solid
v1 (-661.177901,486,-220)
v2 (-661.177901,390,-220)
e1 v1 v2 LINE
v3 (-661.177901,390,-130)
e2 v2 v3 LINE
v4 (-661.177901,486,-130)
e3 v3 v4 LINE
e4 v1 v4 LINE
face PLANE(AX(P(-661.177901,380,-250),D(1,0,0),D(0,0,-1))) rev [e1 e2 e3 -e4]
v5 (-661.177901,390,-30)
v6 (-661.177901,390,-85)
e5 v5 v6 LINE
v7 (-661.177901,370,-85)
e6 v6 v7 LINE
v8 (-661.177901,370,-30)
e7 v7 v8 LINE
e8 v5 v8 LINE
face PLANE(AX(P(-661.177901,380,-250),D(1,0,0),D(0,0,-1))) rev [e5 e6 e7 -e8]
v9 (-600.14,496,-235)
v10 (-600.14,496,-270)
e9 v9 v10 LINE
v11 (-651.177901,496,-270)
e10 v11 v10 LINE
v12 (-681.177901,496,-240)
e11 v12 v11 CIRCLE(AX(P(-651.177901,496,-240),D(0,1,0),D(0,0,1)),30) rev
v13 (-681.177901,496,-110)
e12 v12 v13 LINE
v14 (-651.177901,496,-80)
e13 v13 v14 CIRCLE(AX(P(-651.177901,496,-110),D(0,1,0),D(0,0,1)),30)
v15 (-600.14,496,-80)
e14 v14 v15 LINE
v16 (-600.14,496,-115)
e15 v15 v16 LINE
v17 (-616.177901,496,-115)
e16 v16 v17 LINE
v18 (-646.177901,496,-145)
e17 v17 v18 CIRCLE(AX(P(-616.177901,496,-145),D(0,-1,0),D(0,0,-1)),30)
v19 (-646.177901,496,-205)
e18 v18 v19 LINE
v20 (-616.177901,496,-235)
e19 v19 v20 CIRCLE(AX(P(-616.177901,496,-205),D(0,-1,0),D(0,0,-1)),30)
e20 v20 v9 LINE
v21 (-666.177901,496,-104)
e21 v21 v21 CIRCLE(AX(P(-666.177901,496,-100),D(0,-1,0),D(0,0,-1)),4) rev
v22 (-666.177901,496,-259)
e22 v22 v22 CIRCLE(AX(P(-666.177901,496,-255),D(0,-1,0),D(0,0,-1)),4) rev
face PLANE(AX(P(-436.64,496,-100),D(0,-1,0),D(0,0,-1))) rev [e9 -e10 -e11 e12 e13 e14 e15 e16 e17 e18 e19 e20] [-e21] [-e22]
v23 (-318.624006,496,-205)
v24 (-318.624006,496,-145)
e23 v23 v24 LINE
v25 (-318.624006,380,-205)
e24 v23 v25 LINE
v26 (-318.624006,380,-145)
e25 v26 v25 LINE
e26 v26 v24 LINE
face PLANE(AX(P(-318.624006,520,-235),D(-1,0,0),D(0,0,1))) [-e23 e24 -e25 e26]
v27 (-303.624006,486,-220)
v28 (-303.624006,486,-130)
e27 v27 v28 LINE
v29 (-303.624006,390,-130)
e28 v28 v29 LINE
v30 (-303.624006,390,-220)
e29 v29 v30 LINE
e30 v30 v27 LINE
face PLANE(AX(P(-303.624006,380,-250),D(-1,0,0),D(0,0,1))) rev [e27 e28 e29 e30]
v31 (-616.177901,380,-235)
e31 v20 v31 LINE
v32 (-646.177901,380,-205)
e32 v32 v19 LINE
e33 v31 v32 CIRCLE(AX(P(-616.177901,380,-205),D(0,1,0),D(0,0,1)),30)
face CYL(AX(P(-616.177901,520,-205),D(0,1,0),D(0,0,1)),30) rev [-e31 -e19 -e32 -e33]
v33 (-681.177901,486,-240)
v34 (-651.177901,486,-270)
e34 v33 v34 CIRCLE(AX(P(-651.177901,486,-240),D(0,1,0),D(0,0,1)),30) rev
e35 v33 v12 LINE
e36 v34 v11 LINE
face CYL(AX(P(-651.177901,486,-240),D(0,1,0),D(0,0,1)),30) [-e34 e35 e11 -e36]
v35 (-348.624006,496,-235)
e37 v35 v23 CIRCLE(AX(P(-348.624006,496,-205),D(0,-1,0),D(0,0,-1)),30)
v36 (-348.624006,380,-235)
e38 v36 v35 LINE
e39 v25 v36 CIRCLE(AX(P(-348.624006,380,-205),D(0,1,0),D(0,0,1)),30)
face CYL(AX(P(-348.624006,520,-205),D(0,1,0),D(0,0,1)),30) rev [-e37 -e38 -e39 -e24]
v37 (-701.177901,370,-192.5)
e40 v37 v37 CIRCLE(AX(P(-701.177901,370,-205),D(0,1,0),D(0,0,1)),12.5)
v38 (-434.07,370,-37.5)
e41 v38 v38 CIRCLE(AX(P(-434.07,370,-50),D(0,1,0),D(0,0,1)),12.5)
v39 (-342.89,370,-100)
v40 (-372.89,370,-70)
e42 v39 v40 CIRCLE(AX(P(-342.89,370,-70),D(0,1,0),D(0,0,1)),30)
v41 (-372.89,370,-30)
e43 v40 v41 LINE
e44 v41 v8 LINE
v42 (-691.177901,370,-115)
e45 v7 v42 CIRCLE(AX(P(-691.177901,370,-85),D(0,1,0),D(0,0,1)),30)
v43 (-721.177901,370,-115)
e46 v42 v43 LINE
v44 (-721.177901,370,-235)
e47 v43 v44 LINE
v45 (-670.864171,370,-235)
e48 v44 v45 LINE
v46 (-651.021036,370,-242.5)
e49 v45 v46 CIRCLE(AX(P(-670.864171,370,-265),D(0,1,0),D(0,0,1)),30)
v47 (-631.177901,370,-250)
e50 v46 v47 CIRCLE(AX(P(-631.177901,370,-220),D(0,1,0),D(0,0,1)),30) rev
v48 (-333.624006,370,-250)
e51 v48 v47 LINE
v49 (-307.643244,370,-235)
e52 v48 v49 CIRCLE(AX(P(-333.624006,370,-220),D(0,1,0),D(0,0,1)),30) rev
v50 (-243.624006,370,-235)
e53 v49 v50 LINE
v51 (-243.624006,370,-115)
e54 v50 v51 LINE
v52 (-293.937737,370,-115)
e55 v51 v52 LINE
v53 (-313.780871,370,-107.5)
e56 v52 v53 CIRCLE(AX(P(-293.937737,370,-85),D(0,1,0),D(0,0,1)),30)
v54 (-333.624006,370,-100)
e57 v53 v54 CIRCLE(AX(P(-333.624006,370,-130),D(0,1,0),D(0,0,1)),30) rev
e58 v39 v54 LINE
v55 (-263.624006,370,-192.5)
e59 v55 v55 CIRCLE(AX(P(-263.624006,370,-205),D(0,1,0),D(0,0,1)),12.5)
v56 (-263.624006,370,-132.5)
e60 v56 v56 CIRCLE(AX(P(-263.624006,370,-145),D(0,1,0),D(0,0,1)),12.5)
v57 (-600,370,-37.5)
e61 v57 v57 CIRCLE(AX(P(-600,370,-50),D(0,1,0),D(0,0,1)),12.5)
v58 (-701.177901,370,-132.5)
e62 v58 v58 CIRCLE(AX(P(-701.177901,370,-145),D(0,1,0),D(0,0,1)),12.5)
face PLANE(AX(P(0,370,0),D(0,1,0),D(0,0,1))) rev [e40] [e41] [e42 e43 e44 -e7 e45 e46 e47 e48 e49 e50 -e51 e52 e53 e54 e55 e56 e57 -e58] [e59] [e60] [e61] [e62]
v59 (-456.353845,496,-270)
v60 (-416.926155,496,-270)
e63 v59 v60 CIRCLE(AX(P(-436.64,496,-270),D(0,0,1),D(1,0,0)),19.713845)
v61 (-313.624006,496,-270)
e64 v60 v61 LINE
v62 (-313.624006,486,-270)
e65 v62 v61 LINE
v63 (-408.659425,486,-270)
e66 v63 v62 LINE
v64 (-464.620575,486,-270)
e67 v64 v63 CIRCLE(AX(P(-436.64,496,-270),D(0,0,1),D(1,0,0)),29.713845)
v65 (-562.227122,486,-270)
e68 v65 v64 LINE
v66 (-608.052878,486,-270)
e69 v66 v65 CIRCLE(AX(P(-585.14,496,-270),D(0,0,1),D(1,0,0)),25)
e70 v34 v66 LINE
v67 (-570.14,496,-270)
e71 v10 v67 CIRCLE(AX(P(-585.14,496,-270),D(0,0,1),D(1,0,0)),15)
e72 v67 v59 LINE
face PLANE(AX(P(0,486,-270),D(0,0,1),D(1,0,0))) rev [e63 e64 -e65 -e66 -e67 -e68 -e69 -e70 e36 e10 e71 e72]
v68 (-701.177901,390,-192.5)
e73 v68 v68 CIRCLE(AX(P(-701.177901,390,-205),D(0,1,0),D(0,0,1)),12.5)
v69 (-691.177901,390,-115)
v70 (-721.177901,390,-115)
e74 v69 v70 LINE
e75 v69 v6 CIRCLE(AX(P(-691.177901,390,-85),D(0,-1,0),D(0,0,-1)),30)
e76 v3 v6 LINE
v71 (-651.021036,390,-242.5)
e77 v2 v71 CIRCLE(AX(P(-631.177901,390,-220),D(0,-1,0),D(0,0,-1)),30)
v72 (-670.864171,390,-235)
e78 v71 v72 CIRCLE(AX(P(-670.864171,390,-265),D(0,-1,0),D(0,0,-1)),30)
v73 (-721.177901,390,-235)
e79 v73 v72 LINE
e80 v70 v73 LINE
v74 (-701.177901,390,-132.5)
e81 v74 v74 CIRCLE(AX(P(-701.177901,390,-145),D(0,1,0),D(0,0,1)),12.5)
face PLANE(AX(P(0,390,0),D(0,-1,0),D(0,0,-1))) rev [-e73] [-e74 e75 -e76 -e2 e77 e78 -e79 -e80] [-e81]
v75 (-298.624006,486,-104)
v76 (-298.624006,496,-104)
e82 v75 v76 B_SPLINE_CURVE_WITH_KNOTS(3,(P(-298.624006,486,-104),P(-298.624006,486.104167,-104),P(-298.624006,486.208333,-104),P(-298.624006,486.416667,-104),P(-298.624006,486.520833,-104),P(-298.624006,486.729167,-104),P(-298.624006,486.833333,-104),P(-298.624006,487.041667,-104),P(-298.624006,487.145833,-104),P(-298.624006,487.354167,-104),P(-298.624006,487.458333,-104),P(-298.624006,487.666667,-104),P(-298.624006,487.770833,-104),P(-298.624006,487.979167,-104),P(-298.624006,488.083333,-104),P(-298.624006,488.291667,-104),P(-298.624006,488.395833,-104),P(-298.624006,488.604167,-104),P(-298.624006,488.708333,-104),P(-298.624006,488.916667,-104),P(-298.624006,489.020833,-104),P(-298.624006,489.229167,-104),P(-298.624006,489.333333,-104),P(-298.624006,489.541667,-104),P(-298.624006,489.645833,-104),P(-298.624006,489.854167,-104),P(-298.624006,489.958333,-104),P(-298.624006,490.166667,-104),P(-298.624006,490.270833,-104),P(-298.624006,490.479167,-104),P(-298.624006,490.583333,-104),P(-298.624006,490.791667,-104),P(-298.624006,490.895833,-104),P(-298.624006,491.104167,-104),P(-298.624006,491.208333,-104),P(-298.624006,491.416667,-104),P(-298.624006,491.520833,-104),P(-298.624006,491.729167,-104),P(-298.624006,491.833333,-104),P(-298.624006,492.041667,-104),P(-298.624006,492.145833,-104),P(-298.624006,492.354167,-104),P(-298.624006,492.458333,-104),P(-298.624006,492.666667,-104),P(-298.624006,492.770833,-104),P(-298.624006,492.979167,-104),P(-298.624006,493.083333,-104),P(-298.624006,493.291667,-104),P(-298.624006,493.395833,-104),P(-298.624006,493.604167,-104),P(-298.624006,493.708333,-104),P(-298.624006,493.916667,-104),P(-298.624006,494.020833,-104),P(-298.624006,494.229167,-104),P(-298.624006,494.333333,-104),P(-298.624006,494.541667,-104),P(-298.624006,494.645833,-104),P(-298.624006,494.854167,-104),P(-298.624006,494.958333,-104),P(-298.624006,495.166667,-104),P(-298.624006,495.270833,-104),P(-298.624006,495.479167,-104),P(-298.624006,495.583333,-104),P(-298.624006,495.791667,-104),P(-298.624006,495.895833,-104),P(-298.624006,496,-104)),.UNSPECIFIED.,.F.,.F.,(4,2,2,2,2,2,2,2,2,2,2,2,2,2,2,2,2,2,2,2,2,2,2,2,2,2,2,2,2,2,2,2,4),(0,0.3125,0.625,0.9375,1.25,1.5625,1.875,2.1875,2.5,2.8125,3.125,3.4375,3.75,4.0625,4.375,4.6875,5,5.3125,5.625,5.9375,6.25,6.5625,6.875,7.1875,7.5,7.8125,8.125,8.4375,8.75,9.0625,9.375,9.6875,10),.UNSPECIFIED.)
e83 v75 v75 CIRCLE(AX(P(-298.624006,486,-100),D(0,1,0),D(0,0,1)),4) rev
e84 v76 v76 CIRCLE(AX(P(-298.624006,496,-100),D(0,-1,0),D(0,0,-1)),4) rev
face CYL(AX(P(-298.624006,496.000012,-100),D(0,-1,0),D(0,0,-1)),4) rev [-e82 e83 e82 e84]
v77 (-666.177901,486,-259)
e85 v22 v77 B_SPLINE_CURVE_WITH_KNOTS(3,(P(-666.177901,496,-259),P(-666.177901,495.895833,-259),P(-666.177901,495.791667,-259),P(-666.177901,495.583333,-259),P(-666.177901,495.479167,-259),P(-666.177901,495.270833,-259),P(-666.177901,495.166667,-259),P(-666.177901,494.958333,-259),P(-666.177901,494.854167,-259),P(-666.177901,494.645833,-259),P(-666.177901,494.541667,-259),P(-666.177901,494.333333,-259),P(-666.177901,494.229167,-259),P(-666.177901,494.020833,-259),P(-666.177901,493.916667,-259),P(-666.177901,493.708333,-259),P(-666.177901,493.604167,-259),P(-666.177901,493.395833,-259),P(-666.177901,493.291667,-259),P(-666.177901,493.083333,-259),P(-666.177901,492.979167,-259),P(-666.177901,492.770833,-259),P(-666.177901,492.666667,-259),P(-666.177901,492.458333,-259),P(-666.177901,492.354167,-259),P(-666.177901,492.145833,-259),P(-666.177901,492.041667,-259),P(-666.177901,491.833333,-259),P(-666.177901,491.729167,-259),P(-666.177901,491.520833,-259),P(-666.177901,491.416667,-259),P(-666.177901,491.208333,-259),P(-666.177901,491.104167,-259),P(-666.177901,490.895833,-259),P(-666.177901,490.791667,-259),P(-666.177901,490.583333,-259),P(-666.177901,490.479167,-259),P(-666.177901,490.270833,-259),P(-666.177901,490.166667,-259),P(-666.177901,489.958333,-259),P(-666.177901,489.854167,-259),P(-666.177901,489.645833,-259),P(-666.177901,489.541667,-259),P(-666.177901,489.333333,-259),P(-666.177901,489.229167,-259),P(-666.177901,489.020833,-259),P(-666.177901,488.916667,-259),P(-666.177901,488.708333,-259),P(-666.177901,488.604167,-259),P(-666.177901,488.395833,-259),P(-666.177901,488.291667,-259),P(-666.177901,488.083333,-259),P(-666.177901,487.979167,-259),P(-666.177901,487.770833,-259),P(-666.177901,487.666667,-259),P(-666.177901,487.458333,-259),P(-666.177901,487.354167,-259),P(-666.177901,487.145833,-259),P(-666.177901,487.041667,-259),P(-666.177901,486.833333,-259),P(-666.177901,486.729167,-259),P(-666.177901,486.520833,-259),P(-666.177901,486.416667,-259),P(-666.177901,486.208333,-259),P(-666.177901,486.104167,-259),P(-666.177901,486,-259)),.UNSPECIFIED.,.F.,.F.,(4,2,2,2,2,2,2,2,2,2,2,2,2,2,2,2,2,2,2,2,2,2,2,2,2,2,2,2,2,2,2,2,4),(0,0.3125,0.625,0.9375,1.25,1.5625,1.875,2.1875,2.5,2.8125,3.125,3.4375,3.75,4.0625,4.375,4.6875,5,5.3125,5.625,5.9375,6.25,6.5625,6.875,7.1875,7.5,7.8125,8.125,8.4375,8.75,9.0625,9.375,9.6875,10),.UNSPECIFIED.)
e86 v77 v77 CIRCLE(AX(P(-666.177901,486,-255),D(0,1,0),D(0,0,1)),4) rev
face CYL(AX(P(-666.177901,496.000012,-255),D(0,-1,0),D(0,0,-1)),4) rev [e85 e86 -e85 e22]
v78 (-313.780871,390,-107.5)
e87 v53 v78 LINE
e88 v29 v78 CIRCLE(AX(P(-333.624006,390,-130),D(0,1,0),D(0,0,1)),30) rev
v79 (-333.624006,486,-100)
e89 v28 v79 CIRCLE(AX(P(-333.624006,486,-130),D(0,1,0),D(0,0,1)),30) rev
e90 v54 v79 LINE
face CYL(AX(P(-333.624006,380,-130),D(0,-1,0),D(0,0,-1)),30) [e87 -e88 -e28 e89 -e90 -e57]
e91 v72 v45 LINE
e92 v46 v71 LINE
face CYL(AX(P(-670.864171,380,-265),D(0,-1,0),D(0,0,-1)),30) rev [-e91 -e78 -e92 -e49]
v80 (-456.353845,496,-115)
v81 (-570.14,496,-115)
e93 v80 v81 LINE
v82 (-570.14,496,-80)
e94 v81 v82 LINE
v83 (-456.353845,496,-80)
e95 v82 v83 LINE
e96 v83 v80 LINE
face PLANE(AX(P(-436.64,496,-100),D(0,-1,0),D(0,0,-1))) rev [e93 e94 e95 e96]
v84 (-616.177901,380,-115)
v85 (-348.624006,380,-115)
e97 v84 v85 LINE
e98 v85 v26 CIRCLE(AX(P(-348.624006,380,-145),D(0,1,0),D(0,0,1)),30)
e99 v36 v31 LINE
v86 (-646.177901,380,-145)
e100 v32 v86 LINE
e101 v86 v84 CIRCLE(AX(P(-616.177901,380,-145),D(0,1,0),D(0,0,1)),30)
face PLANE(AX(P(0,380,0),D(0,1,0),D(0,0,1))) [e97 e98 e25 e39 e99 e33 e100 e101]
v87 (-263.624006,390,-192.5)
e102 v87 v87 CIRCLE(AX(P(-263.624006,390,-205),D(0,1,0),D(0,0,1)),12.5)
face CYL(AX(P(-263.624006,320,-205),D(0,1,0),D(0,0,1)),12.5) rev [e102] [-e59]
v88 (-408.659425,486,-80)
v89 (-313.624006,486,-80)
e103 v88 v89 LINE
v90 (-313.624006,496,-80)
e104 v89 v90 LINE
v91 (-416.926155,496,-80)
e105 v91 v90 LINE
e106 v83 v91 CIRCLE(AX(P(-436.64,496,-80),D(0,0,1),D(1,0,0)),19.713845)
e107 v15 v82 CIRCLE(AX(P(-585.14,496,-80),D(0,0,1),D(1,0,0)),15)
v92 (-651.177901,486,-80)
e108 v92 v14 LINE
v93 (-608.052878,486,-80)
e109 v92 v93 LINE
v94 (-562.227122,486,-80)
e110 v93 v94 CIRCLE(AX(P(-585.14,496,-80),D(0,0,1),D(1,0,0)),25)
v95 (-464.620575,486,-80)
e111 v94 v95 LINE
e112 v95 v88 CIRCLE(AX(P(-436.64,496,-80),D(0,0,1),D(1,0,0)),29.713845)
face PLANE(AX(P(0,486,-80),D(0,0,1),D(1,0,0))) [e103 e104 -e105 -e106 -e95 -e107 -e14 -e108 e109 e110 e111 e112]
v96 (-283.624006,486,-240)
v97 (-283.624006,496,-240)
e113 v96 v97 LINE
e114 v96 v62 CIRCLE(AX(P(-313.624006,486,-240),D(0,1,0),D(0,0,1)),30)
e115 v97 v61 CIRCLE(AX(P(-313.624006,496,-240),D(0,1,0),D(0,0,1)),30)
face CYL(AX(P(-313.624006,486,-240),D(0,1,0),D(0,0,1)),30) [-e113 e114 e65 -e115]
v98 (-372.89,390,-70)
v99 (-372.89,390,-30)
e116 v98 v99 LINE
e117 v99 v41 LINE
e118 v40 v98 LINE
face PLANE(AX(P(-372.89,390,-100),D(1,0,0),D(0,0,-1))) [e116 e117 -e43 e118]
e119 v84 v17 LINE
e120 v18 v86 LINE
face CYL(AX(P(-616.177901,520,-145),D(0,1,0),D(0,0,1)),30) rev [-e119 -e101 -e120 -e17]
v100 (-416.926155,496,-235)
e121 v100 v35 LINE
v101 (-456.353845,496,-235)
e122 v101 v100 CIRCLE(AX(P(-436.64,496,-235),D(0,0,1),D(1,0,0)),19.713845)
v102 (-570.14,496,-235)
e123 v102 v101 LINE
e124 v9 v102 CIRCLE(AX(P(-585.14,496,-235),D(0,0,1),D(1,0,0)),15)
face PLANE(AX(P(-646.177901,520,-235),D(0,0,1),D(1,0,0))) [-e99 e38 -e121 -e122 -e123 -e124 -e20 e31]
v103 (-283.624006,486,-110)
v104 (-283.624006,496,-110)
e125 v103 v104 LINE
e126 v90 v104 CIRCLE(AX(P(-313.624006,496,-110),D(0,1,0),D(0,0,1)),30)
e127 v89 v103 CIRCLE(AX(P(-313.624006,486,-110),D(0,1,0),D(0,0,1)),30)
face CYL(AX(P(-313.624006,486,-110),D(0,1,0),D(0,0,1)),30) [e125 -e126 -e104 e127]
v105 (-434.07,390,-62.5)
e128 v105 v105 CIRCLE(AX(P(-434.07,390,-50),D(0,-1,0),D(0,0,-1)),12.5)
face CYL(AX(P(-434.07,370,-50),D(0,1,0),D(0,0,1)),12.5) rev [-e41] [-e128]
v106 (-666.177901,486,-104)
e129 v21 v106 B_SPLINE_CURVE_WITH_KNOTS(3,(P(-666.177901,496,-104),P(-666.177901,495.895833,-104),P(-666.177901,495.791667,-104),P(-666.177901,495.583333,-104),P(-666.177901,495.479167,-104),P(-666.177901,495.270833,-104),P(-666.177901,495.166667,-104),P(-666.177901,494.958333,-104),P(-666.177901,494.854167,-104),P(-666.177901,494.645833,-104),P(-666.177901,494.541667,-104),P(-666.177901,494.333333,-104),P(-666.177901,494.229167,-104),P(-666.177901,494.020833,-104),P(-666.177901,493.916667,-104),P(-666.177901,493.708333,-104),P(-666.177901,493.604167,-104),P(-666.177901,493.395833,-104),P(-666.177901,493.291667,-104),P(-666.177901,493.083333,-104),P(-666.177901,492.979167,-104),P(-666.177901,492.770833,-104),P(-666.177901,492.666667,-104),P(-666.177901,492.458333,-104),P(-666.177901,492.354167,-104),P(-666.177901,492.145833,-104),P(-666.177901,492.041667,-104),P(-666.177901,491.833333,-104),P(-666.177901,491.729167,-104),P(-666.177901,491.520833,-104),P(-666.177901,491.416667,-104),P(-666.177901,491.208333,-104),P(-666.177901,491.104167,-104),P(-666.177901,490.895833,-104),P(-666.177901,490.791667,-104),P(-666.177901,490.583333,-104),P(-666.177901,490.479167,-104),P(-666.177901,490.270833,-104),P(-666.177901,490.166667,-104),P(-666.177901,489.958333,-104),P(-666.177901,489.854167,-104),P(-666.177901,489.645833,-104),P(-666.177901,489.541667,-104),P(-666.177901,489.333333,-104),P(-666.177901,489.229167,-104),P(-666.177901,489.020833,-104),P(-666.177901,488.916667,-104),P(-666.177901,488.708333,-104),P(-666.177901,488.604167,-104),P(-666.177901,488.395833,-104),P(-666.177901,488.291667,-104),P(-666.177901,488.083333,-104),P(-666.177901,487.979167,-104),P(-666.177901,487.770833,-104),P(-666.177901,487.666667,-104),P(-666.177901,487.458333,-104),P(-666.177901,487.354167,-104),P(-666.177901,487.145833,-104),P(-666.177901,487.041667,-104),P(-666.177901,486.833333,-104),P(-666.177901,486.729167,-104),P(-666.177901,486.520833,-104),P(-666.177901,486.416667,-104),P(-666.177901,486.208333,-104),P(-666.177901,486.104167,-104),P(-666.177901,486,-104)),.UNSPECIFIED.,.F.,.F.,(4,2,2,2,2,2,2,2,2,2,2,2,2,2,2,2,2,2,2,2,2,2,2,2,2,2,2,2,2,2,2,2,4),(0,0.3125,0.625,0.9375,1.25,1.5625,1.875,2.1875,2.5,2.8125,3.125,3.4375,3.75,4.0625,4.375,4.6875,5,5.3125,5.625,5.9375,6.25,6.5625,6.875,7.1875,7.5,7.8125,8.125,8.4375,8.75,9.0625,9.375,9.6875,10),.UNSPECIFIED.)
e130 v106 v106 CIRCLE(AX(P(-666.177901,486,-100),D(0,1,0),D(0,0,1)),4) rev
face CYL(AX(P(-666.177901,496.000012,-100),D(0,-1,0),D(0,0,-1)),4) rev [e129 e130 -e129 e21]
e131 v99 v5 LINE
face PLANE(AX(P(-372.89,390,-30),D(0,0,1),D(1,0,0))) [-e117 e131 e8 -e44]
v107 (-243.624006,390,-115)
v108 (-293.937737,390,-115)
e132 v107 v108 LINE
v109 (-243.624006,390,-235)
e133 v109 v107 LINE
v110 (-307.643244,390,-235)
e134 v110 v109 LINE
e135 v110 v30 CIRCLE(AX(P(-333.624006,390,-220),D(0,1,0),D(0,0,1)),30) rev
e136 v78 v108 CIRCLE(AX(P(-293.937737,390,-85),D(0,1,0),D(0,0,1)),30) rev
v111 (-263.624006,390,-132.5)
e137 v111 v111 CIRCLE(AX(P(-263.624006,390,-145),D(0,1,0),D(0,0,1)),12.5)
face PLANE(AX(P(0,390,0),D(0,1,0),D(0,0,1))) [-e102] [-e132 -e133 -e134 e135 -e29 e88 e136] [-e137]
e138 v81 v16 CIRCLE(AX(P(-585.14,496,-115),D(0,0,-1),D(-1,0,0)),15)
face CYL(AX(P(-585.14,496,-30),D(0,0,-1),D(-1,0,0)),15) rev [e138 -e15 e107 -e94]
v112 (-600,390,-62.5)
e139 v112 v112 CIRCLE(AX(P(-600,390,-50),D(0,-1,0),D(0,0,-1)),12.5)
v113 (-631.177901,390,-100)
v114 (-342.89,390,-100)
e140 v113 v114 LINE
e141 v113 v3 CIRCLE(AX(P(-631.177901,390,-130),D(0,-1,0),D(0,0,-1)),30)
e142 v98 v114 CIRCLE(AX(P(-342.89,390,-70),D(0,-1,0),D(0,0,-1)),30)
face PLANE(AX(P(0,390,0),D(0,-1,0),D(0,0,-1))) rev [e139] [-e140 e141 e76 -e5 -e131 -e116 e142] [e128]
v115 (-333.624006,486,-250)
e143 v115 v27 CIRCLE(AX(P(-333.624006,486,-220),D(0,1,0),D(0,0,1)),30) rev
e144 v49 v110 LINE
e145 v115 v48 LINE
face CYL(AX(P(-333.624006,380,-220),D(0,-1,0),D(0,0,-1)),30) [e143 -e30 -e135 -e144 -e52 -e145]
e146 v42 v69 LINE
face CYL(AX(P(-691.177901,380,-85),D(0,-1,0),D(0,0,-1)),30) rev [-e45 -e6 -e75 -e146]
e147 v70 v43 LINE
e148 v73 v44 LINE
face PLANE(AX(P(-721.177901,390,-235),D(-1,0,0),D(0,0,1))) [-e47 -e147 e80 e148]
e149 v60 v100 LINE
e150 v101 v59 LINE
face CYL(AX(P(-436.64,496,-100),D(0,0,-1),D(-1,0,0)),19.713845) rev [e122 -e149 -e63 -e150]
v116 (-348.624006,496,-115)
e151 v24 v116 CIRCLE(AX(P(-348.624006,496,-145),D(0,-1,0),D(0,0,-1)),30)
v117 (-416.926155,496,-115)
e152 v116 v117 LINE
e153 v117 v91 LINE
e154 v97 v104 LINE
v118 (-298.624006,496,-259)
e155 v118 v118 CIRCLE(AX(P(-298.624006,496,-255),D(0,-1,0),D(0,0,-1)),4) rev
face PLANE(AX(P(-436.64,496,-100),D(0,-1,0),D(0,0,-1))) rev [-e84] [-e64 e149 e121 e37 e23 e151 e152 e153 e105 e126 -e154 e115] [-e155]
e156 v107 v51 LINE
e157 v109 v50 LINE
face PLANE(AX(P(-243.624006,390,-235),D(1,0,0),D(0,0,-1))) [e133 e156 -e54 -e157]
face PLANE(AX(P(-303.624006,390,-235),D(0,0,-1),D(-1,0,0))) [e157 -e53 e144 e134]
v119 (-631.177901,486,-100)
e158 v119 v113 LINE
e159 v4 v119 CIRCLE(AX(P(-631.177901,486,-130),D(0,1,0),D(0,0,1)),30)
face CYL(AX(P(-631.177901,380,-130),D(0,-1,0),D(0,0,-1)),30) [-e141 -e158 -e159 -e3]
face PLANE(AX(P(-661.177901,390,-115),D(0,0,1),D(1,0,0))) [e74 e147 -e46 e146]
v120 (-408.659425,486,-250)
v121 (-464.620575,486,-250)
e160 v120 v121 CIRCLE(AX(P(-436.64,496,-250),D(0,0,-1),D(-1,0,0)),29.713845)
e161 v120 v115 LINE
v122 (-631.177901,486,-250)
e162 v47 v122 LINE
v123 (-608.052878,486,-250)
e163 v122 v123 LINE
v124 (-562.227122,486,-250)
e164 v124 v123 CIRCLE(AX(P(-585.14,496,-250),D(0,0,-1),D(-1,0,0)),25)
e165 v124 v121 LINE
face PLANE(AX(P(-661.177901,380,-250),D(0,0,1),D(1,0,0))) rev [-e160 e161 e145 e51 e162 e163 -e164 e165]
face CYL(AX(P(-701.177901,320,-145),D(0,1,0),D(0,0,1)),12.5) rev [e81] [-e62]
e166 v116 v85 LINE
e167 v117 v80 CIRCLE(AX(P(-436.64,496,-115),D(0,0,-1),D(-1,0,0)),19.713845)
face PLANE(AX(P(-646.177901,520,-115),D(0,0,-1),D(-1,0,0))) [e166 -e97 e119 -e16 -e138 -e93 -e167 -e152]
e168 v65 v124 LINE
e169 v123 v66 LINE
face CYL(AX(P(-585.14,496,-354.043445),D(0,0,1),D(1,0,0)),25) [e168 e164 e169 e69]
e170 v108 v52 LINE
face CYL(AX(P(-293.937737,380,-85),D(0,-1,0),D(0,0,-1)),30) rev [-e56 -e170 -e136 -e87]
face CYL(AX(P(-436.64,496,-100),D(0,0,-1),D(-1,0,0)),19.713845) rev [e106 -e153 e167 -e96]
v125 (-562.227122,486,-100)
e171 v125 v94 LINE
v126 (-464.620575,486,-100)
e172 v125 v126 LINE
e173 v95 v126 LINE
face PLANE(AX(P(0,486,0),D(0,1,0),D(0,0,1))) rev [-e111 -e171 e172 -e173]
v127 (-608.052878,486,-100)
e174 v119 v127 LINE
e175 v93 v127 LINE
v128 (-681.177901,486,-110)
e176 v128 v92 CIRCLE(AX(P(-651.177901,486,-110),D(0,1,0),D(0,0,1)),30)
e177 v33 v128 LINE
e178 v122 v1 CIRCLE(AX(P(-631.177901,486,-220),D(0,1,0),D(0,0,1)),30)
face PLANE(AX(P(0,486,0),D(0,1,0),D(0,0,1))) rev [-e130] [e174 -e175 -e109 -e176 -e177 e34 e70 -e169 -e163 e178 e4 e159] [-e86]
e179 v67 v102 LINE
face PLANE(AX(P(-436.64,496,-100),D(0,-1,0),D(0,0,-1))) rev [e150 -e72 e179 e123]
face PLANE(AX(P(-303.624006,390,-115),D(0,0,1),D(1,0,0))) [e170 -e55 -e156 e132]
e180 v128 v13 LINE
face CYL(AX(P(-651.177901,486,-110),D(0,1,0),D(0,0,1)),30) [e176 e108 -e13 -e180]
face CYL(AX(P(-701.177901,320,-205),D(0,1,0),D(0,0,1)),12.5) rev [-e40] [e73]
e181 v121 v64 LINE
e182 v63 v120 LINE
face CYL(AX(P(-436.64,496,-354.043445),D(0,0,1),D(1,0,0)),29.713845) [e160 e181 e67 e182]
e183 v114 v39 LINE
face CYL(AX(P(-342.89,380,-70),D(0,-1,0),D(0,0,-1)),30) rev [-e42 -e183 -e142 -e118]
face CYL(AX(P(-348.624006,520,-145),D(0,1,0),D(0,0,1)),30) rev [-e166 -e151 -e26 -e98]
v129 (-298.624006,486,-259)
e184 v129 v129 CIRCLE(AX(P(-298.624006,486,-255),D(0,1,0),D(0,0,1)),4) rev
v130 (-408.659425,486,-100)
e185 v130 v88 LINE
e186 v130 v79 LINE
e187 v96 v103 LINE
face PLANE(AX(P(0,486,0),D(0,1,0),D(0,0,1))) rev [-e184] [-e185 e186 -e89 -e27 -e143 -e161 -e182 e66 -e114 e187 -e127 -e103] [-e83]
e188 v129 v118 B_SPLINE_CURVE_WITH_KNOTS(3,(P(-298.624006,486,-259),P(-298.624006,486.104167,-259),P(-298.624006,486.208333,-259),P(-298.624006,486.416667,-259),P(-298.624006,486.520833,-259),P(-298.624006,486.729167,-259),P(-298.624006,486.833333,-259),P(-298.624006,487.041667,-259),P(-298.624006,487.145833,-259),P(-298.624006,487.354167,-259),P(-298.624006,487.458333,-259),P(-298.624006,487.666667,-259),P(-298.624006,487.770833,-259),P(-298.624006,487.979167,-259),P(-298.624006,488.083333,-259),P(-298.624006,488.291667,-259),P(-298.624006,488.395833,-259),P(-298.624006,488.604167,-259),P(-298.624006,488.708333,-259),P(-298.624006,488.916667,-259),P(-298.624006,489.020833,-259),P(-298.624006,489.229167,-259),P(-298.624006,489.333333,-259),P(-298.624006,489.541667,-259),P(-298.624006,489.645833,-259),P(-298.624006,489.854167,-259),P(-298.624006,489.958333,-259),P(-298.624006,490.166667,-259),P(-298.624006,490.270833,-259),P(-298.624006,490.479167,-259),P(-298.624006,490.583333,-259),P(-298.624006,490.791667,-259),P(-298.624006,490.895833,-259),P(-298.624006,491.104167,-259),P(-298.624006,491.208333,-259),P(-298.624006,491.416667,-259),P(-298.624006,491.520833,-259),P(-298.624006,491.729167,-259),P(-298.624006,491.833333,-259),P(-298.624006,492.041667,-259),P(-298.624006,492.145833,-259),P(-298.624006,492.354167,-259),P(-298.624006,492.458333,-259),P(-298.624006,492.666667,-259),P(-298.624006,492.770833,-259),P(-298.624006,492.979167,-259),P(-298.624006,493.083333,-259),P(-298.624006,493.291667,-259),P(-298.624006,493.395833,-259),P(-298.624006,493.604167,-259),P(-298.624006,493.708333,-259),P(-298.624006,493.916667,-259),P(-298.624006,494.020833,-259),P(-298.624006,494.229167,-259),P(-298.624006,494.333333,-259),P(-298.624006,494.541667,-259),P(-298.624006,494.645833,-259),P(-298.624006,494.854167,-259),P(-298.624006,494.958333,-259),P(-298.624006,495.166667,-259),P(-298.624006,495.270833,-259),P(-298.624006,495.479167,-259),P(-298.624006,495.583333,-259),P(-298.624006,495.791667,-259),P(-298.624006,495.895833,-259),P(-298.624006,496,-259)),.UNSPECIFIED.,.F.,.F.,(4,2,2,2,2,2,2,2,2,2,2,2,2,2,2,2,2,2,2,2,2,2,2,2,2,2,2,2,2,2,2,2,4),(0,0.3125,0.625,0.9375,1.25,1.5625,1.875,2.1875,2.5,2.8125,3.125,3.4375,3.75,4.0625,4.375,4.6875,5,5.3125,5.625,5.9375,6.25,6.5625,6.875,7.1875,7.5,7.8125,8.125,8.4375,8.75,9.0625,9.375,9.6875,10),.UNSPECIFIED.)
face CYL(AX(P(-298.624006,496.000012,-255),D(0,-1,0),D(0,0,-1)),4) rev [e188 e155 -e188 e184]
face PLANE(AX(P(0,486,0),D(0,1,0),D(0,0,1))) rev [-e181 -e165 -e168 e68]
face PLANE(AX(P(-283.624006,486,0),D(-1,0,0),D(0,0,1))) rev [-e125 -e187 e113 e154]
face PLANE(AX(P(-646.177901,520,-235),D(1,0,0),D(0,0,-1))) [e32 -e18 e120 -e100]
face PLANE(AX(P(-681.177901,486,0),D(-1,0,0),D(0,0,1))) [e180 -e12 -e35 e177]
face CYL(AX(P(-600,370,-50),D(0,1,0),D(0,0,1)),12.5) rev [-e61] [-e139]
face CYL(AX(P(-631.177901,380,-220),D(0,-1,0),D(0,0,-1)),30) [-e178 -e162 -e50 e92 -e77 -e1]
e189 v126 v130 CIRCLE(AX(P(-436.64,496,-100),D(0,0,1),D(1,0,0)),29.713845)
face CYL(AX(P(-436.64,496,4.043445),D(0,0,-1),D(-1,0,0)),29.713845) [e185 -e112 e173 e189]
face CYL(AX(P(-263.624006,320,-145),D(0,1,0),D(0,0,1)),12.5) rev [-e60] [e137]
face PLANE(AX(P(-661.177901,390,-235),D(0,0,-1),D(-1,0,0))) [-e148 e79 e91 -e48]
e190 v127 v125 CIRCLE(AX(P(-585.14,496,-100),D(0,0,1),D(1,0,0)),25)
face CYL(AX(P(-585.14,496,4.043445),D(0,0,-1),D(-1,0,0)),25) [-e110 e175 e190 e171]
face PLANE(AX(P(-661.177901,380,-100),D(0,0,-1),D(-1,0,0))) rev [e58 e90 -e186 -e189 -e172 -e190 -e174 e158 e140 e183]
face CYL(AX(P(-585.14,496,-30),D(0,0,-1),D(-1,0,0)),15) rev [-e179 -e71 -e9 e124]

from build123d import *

# Parameters (mm, degrees)
SKETCH_2_W                = 357.553894744
SKETCH_2_H                = 150
EXTRUDE_1_DEPTH           = 10
SKETCH_3_W                = 357.553894744
SKETCH_3_H                = 150
SKETCH_3_W_2              = 327.553894744
SKETCH_3_H_2              = 120
EXTRUDE_2_DEPTH           = 140
CUT_EXTRUDE_1_DEPTH       = 855.433272333
CUT_EXTRUDE_1_DEPTH_BACK  = 855.433272333
CUT_EXTRUDE_2_DEPTH       = 841.042985132
CUT_EXTRUDE_2_DEPTH_BACK  = 841.042985132
SKETCH_5_R                = 19.713844825
SKETCH_6_W                = 288.287901075
SKETCH_6_H                = 70
EXTRUDE_3_DEPTH           = 20
CUT_EXTRUDE_3_DEPTH       = 715.76724664
CUT_EXTRUDE_3_DEPTH_BACK  = 715.76724664
SKETCH_7_R                = 12.5
CUT_EXTRUDE_4_DEPTH       = 856.319950001
CUT_EXTRUDE_4_DEPTH_BACK  = 856.319950001
SKETCH_8_R                = 15
SKETCH_10_W               = 60
SKETCH_10_H               = 120
EXTRUDE_5_DEPTH           = 20
FILLET_4_R                = 30
FILLET_5_R                = 30
FILLET_6_R                = 30
FILLET_7_R                = 30
FILLET_8_R                = 30
EXTRUDE_6_DEPTH           = 10
CUT_EXTRUDE_5_DEPTH       = 899.965274634
CUT_EXTRUDE_5_DEPTH_BACK  = 899.965274634
SKETCH_12_R               = 15
SKETCH_12_R_2             = 19.713844825
SKETCH_13_R               = 25
SKETCH_13_R_2             = 15
SKETCH_13_R_3             = 29.713844825
SKETCH_13_R_4             = 19.713844825
EXTRUDE_7_DEPTH           = 20
CUT_EXTRUDE_7_DEPTH       = 913.45416961
CUT_EXTRUDE_7_DEPTH_BACK  = 913.45416961
CUT_EXTRUDE_8_DEPTH       = 913.45416961
CUT_EXTRUDE_8_DEPTH_BACK  = 913.45416961
EXTRUDE_START             = 20
SKETCH_16_R               = 29.713844825
SKETCH_16_R_2             = 25
EXTRUDE_8_DEPTH           = 20
CUT_EXTRUDE_9_DEPTH       = 909.500199031
CUT_EXTRUDE_9_DEPTH_BACK  = 909.500199031
SKETCH_17_R               = 15
SKETCH_17_R_2             = 19.713844825
CUT_EXTRUDE_10_DEPTH      = 920.169522797
CUT_EXTRUDE_10_DEPTH_BACK = 920.169522797
CUT_EXTRUDE_11_DEPTH      = 781.303508257
CUT_EXTRUDE_11_DEPTH_BACK = 50
SKETCH_19_R               = 4
SKETCH_20_R               = 12.5
CUT_EXTRUDE_12_DEPTH      = 70


with BuildPart() as part:
    # 草图2 → 凸台-拉伸1 (new body)
    with BuildSketch(Plane(origin=(0, 370, 0), x_dir=(1, 0, 0), z_dir=(0, 1, 0))):
        with Locations((-482.400953703, 175)):
            Rectangle(SKETCH_2_W, SKETCH_2_H)
    extrude(amount=EXTRUDE_1_DEPTH)

    # 草图3 → 凸台-拉伸2 (add)
    with BuildSketch(Plane(origin=(0, 380, 0), x_dir=(1, 0, 0), z_dir=(0, 1, 0))):
        with Locations((-482.400953703, 175)):
            Rectangle(SKETCH_3_W, SKETCH_3_H)
        with Locations((-482.400953703, 175)):
            Rectangle(SKETCH_3_W_2, SKETCH_3_H_2, mode=Mode.SUBTRACT)
    extrude(amount=EXTRUDE_2_DEPTH)

    # 草图4 → 切除-拉伸1 (cut, two sides: drawn at the far end of the back side and taken through both)
    with BuildSketch(Plane(origin=(0, 0, -250), x_dir=(-1, 0, 0), z_dir=(0, 0, -1)).offset(-CUT_EXTRUDE_1_DEPTH_BACK)):
        Polygon((436.64, 496), (179.513025855, 496), (179.513025855, 596.740447495), (436.64, 596.740447495), (733.186864443, 596.740447495), (733.186864443, 496), align=None)
    extrude(amount=CUT_EXTRUDE_1_DEPTH + CUT_EXTRUDE_1_DEPTH_BACK, mode=Mode.SUBTRACT)

    # 草图5 → 切除-拉伸2 (cut, two sides: drawn at the far end of the back side and taken through both)
    with BuildSketch(Plane(origin=(0, 0, -250), x_dir=(-1, 0, 0), z_dir=(0, 0, -1)).offset(-CUT_EXTRUDE_2_DEPTH_BACK)):
        with Locations((436.64, 496)):
            Circle(SKETCH_5_R)
    extrude(amount=CUT_EXTRUDE_2_DEPTH + CUT_EXTRUDE_2_DEPTH_BACK, mode=Mode.SUBTRACT)

    # 草图6 → 凸台-拉伸3 (add)
    with BuildSketch(Plane(origin=(0, 370, 0), x_dir=(-1, 0, 0), z_dir=(0, -1, 0))):
        with Locations((517.033950538, 65)):
            Rectangle(SKETCH_6_W, SKETCH_6_H)
    extrude(amount=-EXTRUDE_3_DEPTH)

    # 草图7 → 切除-拉伸3 (cut, two sides: drawn at the far end of the back side and taken through both)
    with BuildSketch(Plane(origin=(0, 390, 0), x_dir=(1, 0, 0), z_dir=(0, 1, 0)).offset(-CUT_EXTRUDE_3_DEPTH_BACK)):
        with Locations(Location((-600, 50, 0), (0, 0, 270))):
            Circle(SKETCH_7_R)
        with Locations(Location((-434.07, 50, 0), (0, 0, 270))):
            Circle(SKETCH_7_R)
    extrude(amount=CUT_EXTRUDE_3_DEPTH + CUT_EXTRUDE_3_DEPTH_BACK, mode=Mode.SUBTRACT)

    # 草图8 → 切除-拉伸4 (cut, two sides: drawn at the far end of the back side and taken through both)
    with BuildSketch(Plane(origin=(0, 0, -250), x_dir=(-1, 0, 0), z_dir=(0, 0, -1)).offset(-CUT_EXTRUDE_4_DEPTH_BACK)):
        with Locations((585.14, 496)):
            Circle(SKETCH_8_R)
    extrude(amount=CUT_EXTRUDE_4_DEPTH + CUT_EXTRUDE_4_DEPTH_BACK, mode=Mode.SUBTRACT)

    # 草图10 → 凸台-拉伸5 (add)
    with BuildSketch(Plane.XZ.offset(-370)):
        with Locations((-691.177901075, -175)):
            Rectangle(SKETCH_10_W, SKETCH_10_H)
        with Locations((-273.624006331, -175)):
            Rectangle(SKETCH_10_W, SKETCH_10_H)
    extrude(amount=-EXTRUDE_5_DEPTH)

    # 圆角4
    # the kernel refuses this fillet: 30 mm, written as the material it takes off along each edge
    with BuildSketch(Plane(origin=(-303.624006331, 571, -250), x_dir=(-1, 0, 0), z_dir=(0, -1, 0))) as fillet_4_piece_1_section:
        with BuildLine():
            CenterArc((FILLET_4_R, -FILLET_4_R), FILLET_4_R, 90, 90)
            Line((0, -FILLET_4_R), (0, 0))
            Line((0, 0), (FILLET_4_R, 0))
        make_face()
    fillet_4_piece_1 = extrude(amount=276, mode=Mode.PRIVATE)
    fillet_4_piece_1 = split(fillet_4_piece_1, bisect_by=Plane(origin=(-310.944751812, 390, -244.648122102), z_dir=(0, 1, 0)), keep=Keep.TOP, mode=Mode.PRIVATE)
    add(fillet_4_piece_1, mode=Mode.SUBTRACT)
    with BuildSketch(Plane(origin=(-303.624006331, 571, -250), x_dir=(-1, 0, 0), z_dir=(0, -1, 0))) as fillet_4_piece_2_section:
        with BuildLine():
            CenterArc((FILLET_4_R, -FILLET_4_R), FILLET_4_R, 90, 90)
            Line((0, -FILLET_4_R), (0, 0))
            Line((0, 0), (FILLET_4_R, 0))
        make_face()
    fillet_4_piece_2 = extrude(amount=276, mode=Mode.PRIVATE)
    fillet_4_piece_2 = split(fillet_4_piece_2, bisect_by=Plane(origin=(-310.944751812, 380, -235), z_dir=(0, 0, -1)), keep=Keep.TOP, mode=Mode.PRIVATE)
    add(fillet_4_piece_2, mode=Mode.SUBTRACT)
    with BuildSketch(Plane(origin=(-303.624006331, 571, -100), x_dir=(0, 0, -1), z_dir=(0, -1, 0))) as fillet_4_piece_3_section:
        with BuildLine():
            CenterArc((FILLET_4_R, -FILLET_4_R), FILLET_4_R, 90, 90)
            Line((0, -FILLET_4_R), (0, 0))
            Line((0, 0), (FILLET_4_R, 0))
        make_face()
    fillet_4_piece_3 = extrude(amount=276, mode=Mode.PRIVATE)
    fillet_4_piece_3 = split(fillet_4_piece_3, bisect_by=Plane(origin=(-304.814544111, 390, -118.697908378), z_dir=(0, 1, 0)), keep=Keep.TOP, mode=Mode.PRIVATE)
    add(fillet_4_piece_3, mode=Mode.SUBTRACT)
    with BuildSketch(Plane(origin=(-303.624006331, 571, -100), x_dir=(0, 0, -1), z_dir=(0, -1, 0))) as fillet_4_piece_4_section:
        with BuildLine():
            CenterArc((FILLET_4_R, -FILLET_4_R), FILLET_4_R, 90, 90)
            Line((0, -FILLET_4_R), (0, 0))
            Line((0, 0), (FILLET_4_R, 0))
        make_face()
    fillet_4_piece_4 = extrude(amount=276, mode=Mode.PRIVATE)
    fillet_4_piece_4 = split(fillet_4_piece_4, bisect_by=Plane(origin=(-310.944751812, 380, -115), z_dir=(0, 0, 1)), keep=Keep.TOP, mode=Mode.PRIVATE)
    add(fillet_4_piece_4, mode=Mode.SUBTRACT)
    with BuildSketch(Plane(origin=(-661.177901075, 295, -250), x_dir=(1, 0, 0), z_dir=(0, 1, 0))) as fillet_4_piece_5_section:
        with BuildLine():
            CenterArc((FILLET_4_R, -FILLET_4_R), FILLET_4_R, 90, 90)
            Line((0, -FILLET_4_R), (0, 0))
            Line((0, 0), (FILLET_4_R, 0))
        make_face()
    fillet_4_piece_5 = extrude(amount=276, mode=Mode.PRIVATE)
    fillet_4_piece_5 = split(fillet_4_piece_5, bisect_by=Plane(origin=(-653.857155594, 380, -235), z_dir=(0, 0, -1)), keep=Keep.TOP, mode=Mode.PRIVATE)
    add(fillet_4_piece_5, mode=Mode.SUBTRACT)
    with BuildSketch(Plane(origin=(-661.177901075, 295, -250), x_dir=(1, 0, 0), z_dir=(0, 1, 0))) as fillet_4_piece_6_section:
        with BuildLine():
            CenterArc((FILLET_4_R, -FILLET_4_R), FILLET_4_R, 90, 90)
            Line((0, -FILLET_4_R), (0, 0))
            Line((0, 0), (FILLET_4_R, 0))
        make_face()
    fillet_4_piece_6 = extrude(amount=276, mode=Mode.PRIVATE)
    fillet_4_piece_6 = split(fillet_4_piece_6, bisect_by=Plane(origin=(-659.987363294, 390, -231.302091622), z_dir=(0, 1, 0)), keep=Keep.TOP, mode=Mode.PRIVATE)
    add(fillet_4_piece_6, mode=Mode.SUBTRACT)
    with BuildSketch(Plane(origin=(-661.177901075, 390, -100), x_dir=(0, 0, -1), z_dir=(0, 1, 0))) as fillet_4_piece_7:
        with BuildLine():
            CenterArc((FILLET_4_R, -FILLET_4_R), FILLET_4_R, 90, 90)
            Line((0, -FILLET_4_R), (0, 0))
            Line((0, 0), (FILLET_4_R, 0))
        make_face()
    extrude(amount=181, mode=Mode.SUBTRACT)

    # 圆角5
    fillet_5_edges = [part.edges().sort_by_distance(p)[0] for p in [
        (-318.624006331, 438, -115),
        (-318.624006331, 438, -235),
        (-646.177901075, 438, -115),
        (-646.177901075, 438, -235),
    ]]
    fillet(fillet_5_edges, radius=FILLET_5_R)

    # 圆角6
    fillet_6_edges = [part.edges().sort_by_distance(p)[0] for p in [
        (-661.177901075, 380, -115),
        (-372.89, 380, -100),
    ]]
    fillet(fillet_6_edges, radius=FILLET_6_R)

    # 圆角7
    fillet_7_edges = [part.edges().sort_by_distance(p)[0] for p in [
        (-307.643244217, 380, -115),
    ]]
    fillet(fillet_7_edges, radius=FILLET_7_R)

    # 圆角8
    fillet_8_edges = [part.edges().sort_by_distance(p)[0] for p in [
        (-657.158663188, 380, -235),
    ]]
    fillet(fillet_8_edges, radius=FILLET_8_R)

    # 草图11 → 凸台-拉伸6 (add)
    with BuildSketch(Plane(origin=(0, 496, 0), x_dir=(1, 0, 0), z_dir=(0, 1, 0))):
        with BuildLine():
            ThreePointArc((-651.177901075, 270), (-672.39110451, 261.213203436), (-681.177901075, 240))
            Line((-681.177901075, 240), (-681.177901075, 110))
            ThreePointArc((-681.177901075, 110), (-672.39110451, 88.786796564), (-651.177901075, 80))
            Line((-651.177901075, 80), (-313.624006331, 80))
            ThreePointArc((-313.624006331, 80), (-292.410802895, 88.786796564), (-283.624006331, 110))
            Line((-283.624006331, 110), (-283.624006331, 240))
            ThreePointArc((-283.624006331, 240), (-292.410802895, 261.213203436), (-313.624006331, 270))
            Line((-313.624006331, 270), (-651.177901075, 270))
        make_face()
        with BuildLine():
            Line((-600.14, 250), (-456.353844825, 250))
            Line((-456.353844825, 250), (-416.926155175, 250))
            Line((-416.926155175, 250), (-333.624006331, 250))
            ThreePointArc((-333.624006331, 250), (-312.410802895, 241.213203436), (-303.624006331, 220))
            Line((-303.624006331, 220), (-303.624006331, 130))
            ThreePointArc((-303.624006331, 130), (-312.410802895, 108.786796564), (-333.624006331, 100))
            Line((-333.624006331, 100), (-600.14, 100))
            Line((-600.14, 100), (-631.177901075, 100))
            ThreePointArc((-631.177901075, 100), (-652.39110451, 108.786796564), (-661.177901075, 130))
            Line((-661.177901075, 130), (-661.177901075, 220))
            ThreePointArc((-661.177901075, 220), (-652.39110451, 241.213203436), (-631.177901075, 250))
            Line((-631.177901075, 250), (-600.14, 250))
        make_face(mode=Mode.SUBTRACT)
    extrude(amount=-EXTRUDE_6_DEPTH)

    # 草图12 → 切除-拉伸5 (cut, two sides: drawn at the far end of the back side and taken through both)
    with BuildSketch(Plane.XY.offset(-235).offset(-CUT_EXTRUDE_5_DEPTH_BACK)):
        with Locations((-585.14, 496)):
            Circle(SKETCH_12_R)
        with Locations((-436.64, 496)):
            Circle(SKETCH_12_R_2)
    extrude(amount=CUT_EXTRUDE_5_DEPTH + CUT_EXTRUDE_5_DEPTH_BACK, mode=Mode.SUBTRACT)

    # 草图13 → 凸台-拉伸7 (add)
    # profile 1 of 2: a face of its own
    with BuildSketch(Plane.XY.offset(-100)):
        with Locations((-585.14, 496)):
            Circle(SKETCH_13_R)
        with Locations((-585.14, 496)):
            Circle(SKETCH_13_R_2, mode=Mode.SUBTRACT)
    # profile 2 of 2: a face of its own
    with BuildSketch(Plane.XY.offset(-100)):
        with Locations((-436.64, 496)):
            Circle(SKETCH_13_R_3)
        with Locations((-436.64, 496)):
            Circle(SKETCH_13_R_4, mode=Mode.SUBTRACT)
    extrude(amount=EXTRUDE_7_DEPTH)

    # 草图14 → 切除-拉伸7 (cut, two sides: drawn at the far end of the back side and taken through both)
    with BuildSketch(Plane.XY.offset(-80).offset(-CUT_EXTRUDE_7_DEPTH_BACK)):
        with BuildLine():
            ThreePointArc((-600.14, 496), (-585.14, 511), (-570.14, 496))
            Line((-570.14, 496), (-560.14, 496))
            ThreePointArc((-560.14, 496), (-585.14, 521), (-610.14, 496))
            Line((-610.14, 496), (-600.14, 496))
        make_face()
    extrude(amount=CUT_EXTRUDE_7_DEPTH + CUT_EXTRUDE_7_DEPTH_BACK, mode=Mode.SUBTRACT)

    # 草图15 → 切除-拉伸8 (cut, two sides: drawn at the far end of the back side and taken through both)
    with BuildSketch(Plane.XY.offset(-80).offset(-CUT_EXTRUDE_8_DEPTH_BACK)):
        Polygon((-483.519236307, 496), (-384.81297166, 496), (-391.380879004, 542.181337099), (-485.395781263, 523.415887546), align=None)
    extrude(amount=CUT_EXTRUDE_8_DEPTH + CUT_EXTRUDE_8_DEPTH_BACK, mode=Mode.SUBTRACT)

    # 草图16 → 凸台-拉伸8 (add)
    with BuildSketch(Plane(origin=(0, 0, -250), x_dir=(-1, 0, 0), z_dir=(0, 0, -1)).offset(EXTRUDE_START)):
        with Locations((436.64, 496)):
            Circle(SKETCH_16_R)
        with Locations((585.14, 496)):
            Circle(SKETCH_16_R_2)
    extrude(amount=-EXTRUDE_8_DEPTH)

    # 草图17 → 切除-拉伸9 (cut, two sides: drawn at the far end of the back side and taken through both)
    with BuildSketch(Plane.XY.offset(-100).offset(-CUT_EXTRUDE_9_DEPTH_BACK)):
        with Locations((-585.14, 496)):
            Circle(SKETCH_17_R)
        with Locations((-436.64, 496)):
            Circle(SKETCH_17_R_2)
    extrude(amount=CUT_EXTRUDE_9_DEPTH + CUT_EXTRUDE_9_DEPTH_BACK, mode=Mode.SUBTRACT)

    # 草图18 → 切除-拉伸10 (cut, two sides: drawn at the far end of the back side and taken through both)
    with BuildSketch(Plane(origin=(0, 0, -250), x_dir=(-1, 0, 0), z_dir=(0, 0, -1)).offset(-CUT_EXTRUDE_10_DEPTH_BACK)):
        Polygon((376.640943125, 496), (644.852141122, 496), (631.989437133, 582.438917855), (371.35878546, 543.655288835), align=None)
    extrude(amount=CUT_EXTRUDE_10_DEPTH + CUT_EXTRUDE_10_DEPTH_BACK, mode=Mode.SUBTRACT)

    # 草图19 → 切除-拉伸11 (cut, two sides: drawn at the far end of the back side and taken through both)
    with BuildSketch(Plane(origin=(0, 496, 0), x_dir=(1, 0, 0), z_dir=(0, 1, 0)).offset(-CUT_EXTRUDE_11_DEPTH_BACK)):
        with Locations(Location((-666.177901075, 255, 0), (0, 0, 90))):
            Circle(SKETCH_19_R)
        with Locations(Location((-666.177901075, 100, 0), (0, 0, 90))):
            Circle(SKETCH_19_R)
        with Locations(Location((-298.624006331, 100, 0), (0, 0, 90))):
            Circle(SKETCH_19_R)
        with Locations(Location((-298.624006331, 255, 0), (0, 0, 90))):
            Circle(SKETCH_19_R)
    extrude(amount=CUT_EXTRUDE_11_DEPTH + CUT_EXTRUDE_11_DEPTH_BACK, mode=Mode.SUBTRACT)

    # 草图20 → 切除-拉伸12 (cut)
    with BuildSketch(Plane(origin=(0, 390, 0), x_dir=(1, 0, 0), z_dir=(0, 1, 0))):
        with Locations(Location((-701.177901075, 205, 0), (0, 0, 270))):
            Circle(SKETCH_20_R)
        with Locations(Location((-701.177901075, 145, 0), (0, 0, 270))):
            Circle(SKETCH_20_R)
        with Locations(Location((-263.624006331, 205, 0), (0, 0, 270))):
            Circle(SKETCH_20_R)
        with Locations(Location((-263.624006331, 145, 0), (0, 0, 270))):
            Circle(SKETCH_20_R)
    extrude(amount=-CUT_EXTRUDE_12_DEPTH, mode=Mode.SUBTRACT)


solid = part.part
